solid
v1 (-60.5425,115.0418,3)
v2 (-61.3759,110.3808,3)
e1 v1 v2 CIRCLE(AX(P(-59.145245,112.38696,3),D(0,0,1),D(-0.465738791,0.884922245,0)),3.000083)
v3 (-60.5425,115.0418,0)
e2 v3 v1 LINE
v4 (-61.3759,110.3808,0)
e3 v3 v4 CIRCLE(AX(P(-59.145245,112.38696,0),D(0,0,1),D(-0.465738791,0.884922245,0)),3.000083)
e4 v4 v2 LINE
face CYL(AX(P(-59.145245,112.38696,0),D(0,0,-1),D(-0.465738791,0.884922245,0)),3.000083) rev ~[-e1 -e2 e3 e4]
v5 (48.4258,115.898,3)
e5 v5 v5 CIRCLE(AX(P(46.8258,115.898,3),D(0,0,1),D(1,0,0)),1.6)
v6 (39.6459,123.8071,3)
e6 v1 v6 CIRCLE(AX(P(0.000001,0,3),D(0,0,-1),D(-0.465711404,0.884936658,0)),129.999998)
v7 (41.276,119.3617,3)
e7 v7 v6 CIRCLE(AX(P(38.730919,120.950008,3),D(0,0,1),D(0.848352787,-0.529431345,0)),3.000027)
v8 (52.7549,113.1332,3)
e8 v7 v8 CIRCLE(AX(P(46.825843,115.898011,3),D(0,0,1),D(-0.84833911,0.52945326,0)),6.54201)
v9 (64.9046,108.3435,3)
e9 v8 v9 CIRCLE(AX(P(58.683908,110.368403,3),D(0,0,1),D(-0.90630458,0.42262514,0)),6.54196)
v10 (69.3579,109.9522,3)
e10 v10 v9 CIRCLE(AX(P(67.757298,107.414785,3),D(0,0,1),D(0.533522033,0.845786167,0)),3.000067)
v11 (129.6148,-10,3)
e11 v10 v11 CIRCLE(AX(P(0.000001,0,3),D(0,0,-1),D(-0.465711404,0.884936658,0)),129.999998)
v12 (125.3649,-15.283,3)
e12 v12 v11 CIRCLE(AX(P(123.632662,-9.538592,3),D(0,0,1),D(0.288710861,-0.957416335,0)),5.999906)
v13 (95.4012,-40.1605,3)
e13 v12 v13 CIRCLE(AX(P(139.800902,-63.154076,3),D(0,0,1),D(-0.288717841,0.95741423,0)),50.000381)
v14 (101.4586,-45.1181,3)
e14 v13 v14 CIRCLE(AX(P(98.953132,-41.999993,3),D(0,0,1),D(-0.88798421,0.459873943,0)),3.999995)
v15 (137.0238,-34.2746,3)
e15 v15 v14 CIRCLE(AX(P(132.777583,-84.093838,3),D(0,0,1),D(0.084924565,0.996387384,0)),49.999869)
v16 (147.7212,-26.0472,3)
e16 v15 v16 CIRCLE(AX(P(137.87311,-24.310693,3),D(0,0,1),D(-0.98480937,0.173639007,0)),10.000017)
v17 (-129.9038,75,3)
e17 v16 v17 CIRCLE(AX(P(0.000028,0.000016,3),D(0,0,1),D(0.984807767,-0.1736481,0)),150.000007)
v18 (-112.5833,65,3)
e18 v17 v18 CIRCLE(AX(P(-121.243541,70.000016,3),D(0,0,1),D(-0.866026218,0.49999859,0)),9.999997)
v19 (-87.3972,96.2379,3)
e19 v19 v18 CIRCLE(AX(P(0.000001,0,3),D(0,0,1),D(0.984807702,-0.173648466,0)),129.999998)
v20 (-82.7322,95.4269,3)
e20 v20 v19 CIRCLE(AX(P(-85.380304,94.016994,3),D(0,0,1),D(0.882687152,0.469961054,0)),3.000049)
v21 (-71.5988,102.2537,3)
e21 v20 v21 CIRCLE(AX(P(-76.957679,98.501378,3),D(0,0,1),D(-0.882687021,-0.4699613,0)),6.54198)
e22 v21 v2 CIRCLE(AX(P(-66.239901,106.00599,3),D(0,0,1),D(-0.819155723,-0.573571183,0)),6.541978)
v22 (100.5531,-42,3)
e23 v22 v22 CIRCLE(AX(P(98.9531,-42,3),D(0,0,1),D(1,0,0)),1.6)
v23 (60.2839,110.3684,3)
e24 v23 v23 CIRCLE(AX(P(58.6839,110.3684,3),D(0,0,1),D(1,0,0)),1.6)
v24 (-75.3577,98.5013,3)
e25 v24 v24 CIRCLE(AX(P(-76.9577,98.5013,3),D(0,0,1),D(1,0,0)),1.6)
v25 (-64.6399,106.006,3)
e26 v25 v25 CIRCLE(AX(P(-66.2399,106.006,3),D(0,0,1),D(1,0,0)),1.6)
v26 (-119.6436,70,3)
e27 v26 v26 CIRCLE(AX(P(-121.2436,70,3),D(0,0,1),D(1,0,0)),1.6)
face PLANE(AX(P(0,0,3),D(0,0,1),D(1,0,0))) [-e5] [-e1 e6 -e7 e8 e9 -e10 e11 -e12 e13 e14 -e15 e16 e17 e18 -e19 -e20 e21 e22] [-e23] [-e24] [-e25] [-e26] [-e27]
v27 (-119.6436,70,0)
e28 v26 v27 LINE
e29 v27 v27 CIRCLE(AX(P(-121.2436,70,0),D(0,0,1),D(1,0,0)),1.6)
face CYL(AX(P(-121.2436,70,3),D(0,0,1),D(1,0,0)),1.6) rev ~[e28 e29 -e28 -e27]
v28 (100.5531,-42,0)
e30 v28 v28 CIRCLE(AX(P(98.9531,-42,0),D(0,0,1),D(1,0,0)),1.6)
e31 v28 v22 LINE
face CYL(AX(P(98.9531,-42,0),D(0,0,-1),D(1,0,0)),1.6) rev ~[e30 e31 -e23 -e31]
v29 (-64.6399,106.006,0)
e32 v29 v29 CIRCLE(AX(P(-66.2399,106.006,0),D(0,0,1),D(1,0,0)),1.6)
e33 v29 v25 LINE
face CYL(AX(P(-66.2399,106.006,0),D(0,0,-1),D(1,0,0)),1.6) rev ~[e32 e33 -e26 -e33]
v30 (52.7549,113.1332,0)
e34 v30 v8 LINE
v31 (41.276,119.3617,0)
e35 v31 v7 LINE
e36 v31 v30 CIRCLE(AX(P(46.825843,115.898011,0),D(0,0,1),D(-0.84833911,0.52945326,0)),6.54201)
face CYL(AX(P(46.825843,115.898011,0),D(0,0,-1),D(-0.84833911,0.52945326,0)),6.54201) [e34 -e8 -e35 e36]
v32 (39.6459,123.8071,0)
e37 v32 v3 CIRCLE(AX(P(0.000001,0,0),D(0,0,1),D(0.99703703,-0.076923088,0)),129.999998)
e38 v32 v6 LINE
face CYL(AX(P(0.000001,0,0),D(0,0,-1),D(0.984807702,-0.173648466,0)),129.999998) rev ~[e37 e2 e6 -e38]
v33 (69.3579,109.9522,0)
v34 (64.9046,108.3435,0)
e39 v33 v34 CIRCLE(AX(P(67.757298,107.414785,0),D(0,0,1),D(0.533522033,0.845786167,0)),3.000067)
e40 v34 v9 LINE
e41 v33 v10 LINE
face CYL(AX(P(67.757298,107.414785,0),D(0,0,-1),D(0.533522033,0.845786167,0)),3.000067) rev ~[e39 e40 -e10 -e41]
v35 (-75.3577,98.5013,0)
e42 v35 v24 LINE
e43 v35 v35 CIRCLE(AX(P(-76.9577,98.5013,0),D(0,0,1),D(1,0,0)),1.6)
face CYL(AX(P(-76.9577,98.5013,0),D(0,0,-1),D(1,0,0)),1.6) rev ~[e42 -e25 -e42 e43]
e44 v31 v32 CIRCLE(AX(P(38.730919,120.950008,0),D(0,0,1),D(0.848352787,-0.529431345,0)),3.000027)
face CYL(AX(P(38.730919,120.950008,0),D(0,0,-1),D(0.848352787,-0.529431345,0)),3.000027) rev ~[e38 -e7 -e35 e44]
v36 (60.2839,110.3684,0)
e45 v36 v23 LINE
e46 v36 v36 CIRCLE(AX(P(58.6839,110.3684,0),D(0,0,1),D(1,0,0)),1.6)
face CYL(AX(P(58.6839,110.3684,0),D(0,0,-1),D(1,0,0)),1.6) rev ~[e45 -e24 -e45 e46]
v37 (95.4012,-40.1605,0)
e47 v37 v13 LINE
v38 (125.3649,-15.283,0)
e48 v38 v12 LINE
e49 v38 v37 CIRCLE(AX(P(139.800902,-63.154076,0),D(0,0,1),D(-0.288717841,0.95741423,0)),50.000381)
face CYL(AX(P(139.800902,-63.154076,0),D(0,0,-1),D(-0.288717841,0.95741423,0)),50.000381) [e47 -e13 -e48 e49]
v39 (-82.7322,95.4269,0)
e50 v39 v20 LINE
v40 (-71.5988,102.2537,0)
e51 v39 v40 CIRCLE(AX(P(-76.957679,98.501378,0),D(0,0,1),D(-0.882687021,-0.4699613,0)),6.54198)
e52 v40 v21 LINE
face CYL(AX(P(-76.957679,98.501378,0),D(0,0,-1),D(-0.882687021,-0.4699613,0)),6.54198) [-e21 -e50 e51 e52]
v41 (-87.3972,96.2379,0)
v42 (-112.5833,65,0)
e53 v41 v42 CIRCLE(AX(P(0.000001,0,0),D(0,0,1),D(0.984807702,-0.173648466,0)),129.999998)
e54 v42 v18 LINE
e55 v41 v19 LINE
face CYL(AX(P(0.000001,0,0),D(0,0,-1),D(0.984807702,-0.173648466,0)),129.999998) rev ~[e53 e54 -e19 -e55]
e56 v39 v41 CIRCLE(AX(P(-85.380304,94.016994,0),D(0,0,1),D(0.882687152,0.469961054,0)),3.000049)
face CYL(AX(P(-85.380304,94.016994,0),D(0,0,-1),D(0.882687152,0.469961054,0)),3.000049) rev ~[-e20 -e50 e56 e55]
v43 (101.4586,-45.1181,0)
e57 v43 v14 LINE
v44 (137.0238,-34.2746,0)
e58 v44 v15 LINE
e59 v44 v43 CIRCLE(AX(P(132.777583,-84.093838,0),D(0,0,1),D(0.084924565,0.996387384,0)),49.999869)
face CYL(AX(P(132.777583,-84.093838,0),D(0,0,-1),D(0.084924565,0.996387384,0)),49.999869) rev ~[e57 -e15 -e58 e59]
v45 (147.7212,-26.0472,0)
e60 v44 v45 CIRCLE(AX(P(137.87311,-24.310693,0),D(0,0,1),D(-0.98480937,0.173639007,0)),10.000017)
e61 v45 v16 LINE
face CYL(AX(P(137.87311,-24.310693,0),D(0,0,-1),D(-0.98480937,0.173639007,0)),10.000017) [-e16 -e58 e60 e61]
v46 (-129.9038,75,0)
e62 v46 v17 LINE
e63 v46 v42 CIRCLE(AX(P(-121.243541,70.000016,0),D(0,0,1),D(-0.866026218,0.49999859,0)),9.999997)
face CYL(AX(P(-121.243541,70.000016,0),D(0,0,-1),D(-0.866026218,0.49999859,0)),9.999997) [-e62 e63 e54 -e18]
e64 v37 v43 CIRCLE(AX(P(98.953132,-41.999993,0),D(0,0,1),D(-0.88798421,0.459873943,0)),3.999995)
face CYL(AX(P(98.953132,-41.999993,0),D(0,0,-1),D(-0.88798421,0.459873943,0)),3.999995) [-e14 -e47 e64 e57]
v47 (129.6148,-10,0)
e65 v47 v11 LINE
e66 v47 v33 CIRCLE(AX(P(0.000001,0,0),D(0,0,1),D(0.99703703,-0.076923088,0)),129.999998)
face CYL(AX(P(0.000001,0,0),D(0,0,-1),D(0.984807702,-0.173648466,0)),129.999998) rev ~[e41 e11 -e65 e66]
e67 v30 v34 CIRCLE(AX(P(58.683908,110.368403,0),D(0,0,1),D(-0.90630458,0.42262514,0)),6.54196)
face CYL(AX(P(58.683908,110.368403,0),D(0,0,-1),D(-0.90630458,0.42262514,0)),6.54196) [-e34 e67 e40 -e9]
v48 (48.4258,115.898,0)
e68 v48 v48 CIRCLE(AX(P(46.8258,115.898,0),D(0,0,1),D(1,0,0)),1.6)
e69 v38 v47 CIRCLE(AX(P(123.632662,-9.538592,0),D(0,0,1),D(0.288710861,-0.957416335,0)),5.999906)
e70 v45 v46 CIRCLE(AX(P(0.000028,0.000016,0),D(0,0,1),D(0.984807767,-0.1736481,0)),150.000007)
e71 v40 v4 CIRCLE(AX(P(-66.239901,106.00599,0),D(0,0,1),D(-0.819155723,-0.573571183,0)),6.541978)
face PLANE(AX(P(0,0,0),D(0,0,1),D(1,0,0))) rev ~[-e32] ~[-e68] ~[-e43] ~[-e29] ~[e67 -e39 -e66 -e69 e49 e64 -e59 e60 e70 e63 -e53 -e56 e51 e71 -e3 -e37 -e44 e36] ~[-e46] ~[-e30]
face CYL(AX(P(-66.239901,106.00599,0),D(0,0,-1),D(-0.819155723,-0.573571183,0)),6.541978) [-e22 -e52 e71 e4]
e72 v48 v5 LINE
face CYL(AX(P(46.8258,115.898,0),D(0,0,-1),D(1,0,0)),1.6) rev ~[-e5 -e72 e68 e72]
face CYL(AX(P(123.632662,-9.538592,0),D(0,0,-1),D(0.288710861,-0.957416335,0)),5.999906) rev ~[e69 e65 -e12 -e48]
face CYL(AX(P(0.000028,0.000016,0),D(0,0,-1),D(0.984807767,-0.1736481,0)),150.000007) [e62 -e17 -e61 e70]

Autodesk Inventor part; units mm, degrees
ref_plane "YZ Plane" through (0, 0, 0) normal (1, 0, 0) x (0, 1, 0)
ref_plane "XZ Plane" through (0, 0, 0) normal (0, 1, 0) x (-1, 0, 0)
ref_plane "XY Plane" through (0, 0, 0) normal (0, 0, 1) x (1, 0, 0)
sketch "スケッチ1" plane through (0, 0, 0) normal (0, 0, 1) x (1, 0, 0)
  arc A0 (137.8731, -24.3107) -> (-121.2436, 70) centre (0, 0) ccw construction
  arc A1 (147.7212, -26.0472) -> (-129.9038, 75) centre (0, 0) ccw
  arc A2 (128.025, -22.5743) -> (-112.5833, 65) centre (0, 0) ccw
  arc A3 (128.025, -22.5743) -> (147.7212, -26.0472) centre (137.8731, -24.3107) ccw
  arc A4 (-129.9038, 75) -> (-112.5833, 65) centre (-121.2436, 70) ccw
  line L0 (0, 0) -> (0, 140) construction
  circle A5 centre (-121.2436, 70) radius 1.6
  circle A6 centre (98.9531, -42) radius 1.6
  arc A7 (95.4012, -40.1605) -> (101.4586, -45.1181) centre (98.9531, -42) ccw
  circle A8 centre (-76.9577, 98.5013) radius 1.6
  circle A9 centre (-66.2399, 106.006) radius 1.6
  circle A10 centre (0, 0) radius 125 construction
  arc A11 (-82.7322, 95.4269) -> (-87.3972, 96.2379) centre (-85.3803, 94.017) ccw
  arc A12 (-60.5425, 115.0418) -> (-61.3759, 110.3808) centre (-59.1453, 112.387) ccw
  arc A13 (-82.7322, 95.4269) -> (-71.5988, 102.2537) centre (-76.9577, 98.5013) ccw
  line L1 (-71.5988, 102.2537) -> (-74.5649, 106.4898)
  line L2 (-74.5649, 106.4898) -> (-71.5988, 102.2537)
  arc A14 (-71.5988, 102.2537) -> (-61.3759, 110.3808) centre (-66.2399, 106.006) ccw
  circle A15 centre (58.6839, 110.3684) radius 1.6
  arc A16 (69.3579, 109.9522) -> (64.9046, 108.3435) centre (67.7573, 107.4148) ccw
  arc A17 (52.7549, 113.1332) -> (64.9046, 108.3435) centre (58.6839, 110.3684) ccw
  circle A18 centre (46.8258, 115.898) radius 1.6
  line L3 (52.7549, 113.1332) -> (54.9404, 117.82)
  line L4 (54.9404, 117.82) -> (52.7549, 113.1332)
  arc A19 (41.276, 119.3617) -> (52.7549, 113.1332) centre (46.8258, 115.898) ccw
  arc A20 (41.276, 119.3617) -> (39.6459, 123.8071) centre (38.731, 120.95) ccw
  arc A21 (69.3579, 109.9522) -> (39.6459, 123.8071) centre (48.7491, 104.5427) ccw
  circle A22 centre (98.9531, -42) radius 1.6 projected
  arc A23 (137.0238, -34.2746) -> (101.4586, -45.1181) centre (132.7776, -84.094) ccw
  arc A24 (125.3649, -15.283) -> (95.4012, -40.1605) centre (139.8007, -63.1537) ccw
  arc A25 (125.3649, -15.283) -> (129.6148, -10) centre (123.6326, -9.5385) ccw
  dimension "d0" = 140
  dimension "d1" = 10
  dimension "d4" = 60
  dimension "d5" = 100
  dimension "d6" = 3.2
  dimension "d17" = 8
  dimension "d19" = 3.2
  dimension "d21" = 250
  dimension "d22" = 22
  dimension "d23" = 28
  dimension "d26" = 3
  dimension "d30" = 60
  dimension "d53" = 3.2
  dimension "d54" = 21.307
  dimension "d56" = 50
  dimension "d57" = 6
  dimension "d58" = 50
  dimension "d59" = 10
extrude "押し出し1" add sketch "スケッチ1" along normal blind 3 contours A3 A2 A21 A4 A1 | A23 A7 A24 A25 A2 A3 | A2 L1 A13 A11 | A2 A12 A14 L1 | A2 A21 | A5
sketch "スケッチ3" plane through (0, 0, 0) normal (0, 0, 1) x (1, 0, 0)
  arc A0 (137.8731, -24.3107) -> (-121.2436, 70) centre (0, 0) ccw construction
  arc A1 (147.7212, -26.0472) -> (-129.9038, 75) centre (0, 0) ccw
  arc A2 (128.025, -22.5743) -> (147.7212, -26.0472) centre (137.8731, -24.3107) ccw
  arc A3 (-129.9038, 75) -> (-112.5833, 65) centre (-121.2436, 70) ccw
  line L0 (0, 0) -> (0, 140) construction
  circle A4 centre (-121.2436, 70) radius 1.6
  circle A5 centre (122.3274, -44) radius 1.6
  arc A6 (122.6106, -49.4927) -> (125.9627, -48.1273) centre (122.3274, -44) ccw
  line L1 (125.9627, -48.1273) -> (144.4827, -31.8149)
  circle A7 centre (102.9531, -46) radius 1.6
  arc A8 (102.4785, -41.5251) -> (103.1848, -50.494) centre (102.9531, -46) ccw
  line L2 (122.6106, -49.4927) -> (103.1848, -50.494)
  arc A9 (102.4785, -41.5251) -> (129.1083, -15.2002) centre (99.3141, -11.6925) ccw
  circle A10 centre (-76.9577, 98.5013) radius 1.6
  circle A11 centre (-66.2399, 106.006) radius 1.6
  circle A12 centre (0, 0) radius 125 construction
  arc A13 (-82.7322, 95.4269) -> (-87.3972, 96.2379) centre (-85.3803, 94.017) ccw
  arc A14 (-60.5425, 115.0418) -> (-61.3759, 110.3808) centre (-59.1453, 112.387) ccw
  arc A15 (-82.7322, 95.4269) -> (-71.5988, 102.2537) centre (-76.9577, 98.5013) ccw
  line L3 (-71.5988, 102.2537) -> (-74.5649, 106.4898)
  line L4 (-74.5649, 106.4898) -> (-71.5988, 102.2537)
  arc A16 (-71.5988, 102.2537) -> (-61.3759, 110.3808) centre (-66.2399, 106.006) ccw
  circle A17 centre (58.6839, 110.3684) radius 1.6
  arc A18 (69.3579, 109.9522) -> (64.9046, 108.3435) centre (67.7573, 107.4148) ccw
  arc A19 (52.7549, 113.1332) -> (64.9046, 108.3435) centre (58.6839, 110.3684) ccw
  circle A20 centre (46.8258, 115.898) radius 1.6
  line L5 (52.7549, 113.1332) -> (54.9404, 117.82)
  line L6 (54.9404, 117.82) -> (52.7549, 113.1332)
  arc A21 (41.276, 119.3617) -> (52.7549, 113.1332) centre (46.8258, 115.898) ccw
  arc A22 (41.276, 119.3617) -> (39.6459, 123.8071) centre (38.731, 120.95) ccw
  arc A23 (69.3579, 109.9522) -> (39.6459, 123.8071) centre (0, 0) ccw
  dimension "d34" = 140
  dimension "d35" = 10
  dimension "d36" = 60
  dimension "d37" = 100
  dimension "d38" = 3.2
  dimension "d39" = 11
  dimension "d40" = 9
  dimension "d41" = 30
  dimension "d42" = 3.2
  dimension "d43" = 250
  dimension "d44" = 22
  dimension "d45" = 28
  dimension "d46" = 3
  dimension "d47" = 60
extrude "押し出し3" add sketch "スケッチ3" along normal blind 3 contours A18 A19 L5 A23 | L5 A21 A22 A23
sketch "スケッチ4" plane through (0, 0, 3) normal (0, 0, 1) x (1, 0, 0)
  circle A0 centre (58.6839, 110.3684) radius 1.6 projected
  circle A1 centre (46.8258, 115.898) radius 1.6 projected
  circle A2 centre (98.9531, -42) radius 1.6 projected
  arc A3 (125.3649, -15.283) -> (129.6148, -10) centre (123.6326, -9.5385) ccw projected
  arc A4 (125.3649, -15.283) -> (95.4012, -40.1605) centre (139.8007, -63.1537) ccw projected
  arc A5 (95.4012, -40.1605) -> (101.4586, -45.1181) centre (98.9531, -42) ccw projected
  arc A6 (137.0238, -34.2746) -> (101.4586, -45.1181) centre (132.7776, -84.094) ccw projected
  arc A7 (137.0238, -34.2746) -> (147.7212, -26.0472) centre (137.8731, -24.3107) ccw projected
  arc A8 (147.7212, -26.0472) -> (-129.9038, 75) centre (0, 0) ccw projected
  arc A9 (-129.9038, 75) -> (-112.5833, 65) centre (-121.2436, 70) ccw projected
  arc A10 (-87.3972, 96.2379) -> (-112.5833, 65) centre (0, 0) ccw projected
  arc A11 (-82.7322, 95.4269) -> (-87.3972, 96.2379) centre (-85.3803, 94.017) ccw projected
  arc A12 (-82.7322, 95.4269) -> (-71.5988, 102.2537) centre (-76.9577, 98.5013) ccw projected
  arc A13 (-71.5988, 102.2537) -> (-61.3759, 110.3808) centre (-66.2399, 106.006) ccw projected
  arc A14 (-60.5425, 115.0418) -> (-61.3759, 110.3808) centre (-59.1453, 112.387) ccw projected
  arc A15 (39.6459, 123.8071) -> (-60.5425, 115.0418) centre (0, 0) ccw projected
  arc A16 (41.276, 119.3617) -> (39.6459, 123.8071) centre (38.731, 120.95) ccw projected
  arc A17 (41.276, 119.3617) -> (52.7549, 113.1332) centre (46.8258, 115.898) ccw projected
  arc A18 (52.7549, 113.1332) -> (64.9046, 108.3435) centre (58.6839, 110.3684) ccw projected
  arc A19 (69.3579, 109.9522) -> (64.9046, 108.3435) centre (67.7573, 107.4148) ccw projected
  arc A20 (129.6148, -10) -> (69.3579, 109.9522) centre (0, 0) ccw projected
  circle A21 centre (-66.2399, 106.006) radius 1.6 projected
  circle A22 centre (-76.9577, 98.5013) radius 1.6 projected
  circle A23 centre (-121.2436, 70) radius 1.6
  dimension "d60" = 3.2
extrude "押し出し4" cut sketch "スケッチ4" against normal blind 10 contours A23
properties part number "RailWay" material "アクリル、クリア"
